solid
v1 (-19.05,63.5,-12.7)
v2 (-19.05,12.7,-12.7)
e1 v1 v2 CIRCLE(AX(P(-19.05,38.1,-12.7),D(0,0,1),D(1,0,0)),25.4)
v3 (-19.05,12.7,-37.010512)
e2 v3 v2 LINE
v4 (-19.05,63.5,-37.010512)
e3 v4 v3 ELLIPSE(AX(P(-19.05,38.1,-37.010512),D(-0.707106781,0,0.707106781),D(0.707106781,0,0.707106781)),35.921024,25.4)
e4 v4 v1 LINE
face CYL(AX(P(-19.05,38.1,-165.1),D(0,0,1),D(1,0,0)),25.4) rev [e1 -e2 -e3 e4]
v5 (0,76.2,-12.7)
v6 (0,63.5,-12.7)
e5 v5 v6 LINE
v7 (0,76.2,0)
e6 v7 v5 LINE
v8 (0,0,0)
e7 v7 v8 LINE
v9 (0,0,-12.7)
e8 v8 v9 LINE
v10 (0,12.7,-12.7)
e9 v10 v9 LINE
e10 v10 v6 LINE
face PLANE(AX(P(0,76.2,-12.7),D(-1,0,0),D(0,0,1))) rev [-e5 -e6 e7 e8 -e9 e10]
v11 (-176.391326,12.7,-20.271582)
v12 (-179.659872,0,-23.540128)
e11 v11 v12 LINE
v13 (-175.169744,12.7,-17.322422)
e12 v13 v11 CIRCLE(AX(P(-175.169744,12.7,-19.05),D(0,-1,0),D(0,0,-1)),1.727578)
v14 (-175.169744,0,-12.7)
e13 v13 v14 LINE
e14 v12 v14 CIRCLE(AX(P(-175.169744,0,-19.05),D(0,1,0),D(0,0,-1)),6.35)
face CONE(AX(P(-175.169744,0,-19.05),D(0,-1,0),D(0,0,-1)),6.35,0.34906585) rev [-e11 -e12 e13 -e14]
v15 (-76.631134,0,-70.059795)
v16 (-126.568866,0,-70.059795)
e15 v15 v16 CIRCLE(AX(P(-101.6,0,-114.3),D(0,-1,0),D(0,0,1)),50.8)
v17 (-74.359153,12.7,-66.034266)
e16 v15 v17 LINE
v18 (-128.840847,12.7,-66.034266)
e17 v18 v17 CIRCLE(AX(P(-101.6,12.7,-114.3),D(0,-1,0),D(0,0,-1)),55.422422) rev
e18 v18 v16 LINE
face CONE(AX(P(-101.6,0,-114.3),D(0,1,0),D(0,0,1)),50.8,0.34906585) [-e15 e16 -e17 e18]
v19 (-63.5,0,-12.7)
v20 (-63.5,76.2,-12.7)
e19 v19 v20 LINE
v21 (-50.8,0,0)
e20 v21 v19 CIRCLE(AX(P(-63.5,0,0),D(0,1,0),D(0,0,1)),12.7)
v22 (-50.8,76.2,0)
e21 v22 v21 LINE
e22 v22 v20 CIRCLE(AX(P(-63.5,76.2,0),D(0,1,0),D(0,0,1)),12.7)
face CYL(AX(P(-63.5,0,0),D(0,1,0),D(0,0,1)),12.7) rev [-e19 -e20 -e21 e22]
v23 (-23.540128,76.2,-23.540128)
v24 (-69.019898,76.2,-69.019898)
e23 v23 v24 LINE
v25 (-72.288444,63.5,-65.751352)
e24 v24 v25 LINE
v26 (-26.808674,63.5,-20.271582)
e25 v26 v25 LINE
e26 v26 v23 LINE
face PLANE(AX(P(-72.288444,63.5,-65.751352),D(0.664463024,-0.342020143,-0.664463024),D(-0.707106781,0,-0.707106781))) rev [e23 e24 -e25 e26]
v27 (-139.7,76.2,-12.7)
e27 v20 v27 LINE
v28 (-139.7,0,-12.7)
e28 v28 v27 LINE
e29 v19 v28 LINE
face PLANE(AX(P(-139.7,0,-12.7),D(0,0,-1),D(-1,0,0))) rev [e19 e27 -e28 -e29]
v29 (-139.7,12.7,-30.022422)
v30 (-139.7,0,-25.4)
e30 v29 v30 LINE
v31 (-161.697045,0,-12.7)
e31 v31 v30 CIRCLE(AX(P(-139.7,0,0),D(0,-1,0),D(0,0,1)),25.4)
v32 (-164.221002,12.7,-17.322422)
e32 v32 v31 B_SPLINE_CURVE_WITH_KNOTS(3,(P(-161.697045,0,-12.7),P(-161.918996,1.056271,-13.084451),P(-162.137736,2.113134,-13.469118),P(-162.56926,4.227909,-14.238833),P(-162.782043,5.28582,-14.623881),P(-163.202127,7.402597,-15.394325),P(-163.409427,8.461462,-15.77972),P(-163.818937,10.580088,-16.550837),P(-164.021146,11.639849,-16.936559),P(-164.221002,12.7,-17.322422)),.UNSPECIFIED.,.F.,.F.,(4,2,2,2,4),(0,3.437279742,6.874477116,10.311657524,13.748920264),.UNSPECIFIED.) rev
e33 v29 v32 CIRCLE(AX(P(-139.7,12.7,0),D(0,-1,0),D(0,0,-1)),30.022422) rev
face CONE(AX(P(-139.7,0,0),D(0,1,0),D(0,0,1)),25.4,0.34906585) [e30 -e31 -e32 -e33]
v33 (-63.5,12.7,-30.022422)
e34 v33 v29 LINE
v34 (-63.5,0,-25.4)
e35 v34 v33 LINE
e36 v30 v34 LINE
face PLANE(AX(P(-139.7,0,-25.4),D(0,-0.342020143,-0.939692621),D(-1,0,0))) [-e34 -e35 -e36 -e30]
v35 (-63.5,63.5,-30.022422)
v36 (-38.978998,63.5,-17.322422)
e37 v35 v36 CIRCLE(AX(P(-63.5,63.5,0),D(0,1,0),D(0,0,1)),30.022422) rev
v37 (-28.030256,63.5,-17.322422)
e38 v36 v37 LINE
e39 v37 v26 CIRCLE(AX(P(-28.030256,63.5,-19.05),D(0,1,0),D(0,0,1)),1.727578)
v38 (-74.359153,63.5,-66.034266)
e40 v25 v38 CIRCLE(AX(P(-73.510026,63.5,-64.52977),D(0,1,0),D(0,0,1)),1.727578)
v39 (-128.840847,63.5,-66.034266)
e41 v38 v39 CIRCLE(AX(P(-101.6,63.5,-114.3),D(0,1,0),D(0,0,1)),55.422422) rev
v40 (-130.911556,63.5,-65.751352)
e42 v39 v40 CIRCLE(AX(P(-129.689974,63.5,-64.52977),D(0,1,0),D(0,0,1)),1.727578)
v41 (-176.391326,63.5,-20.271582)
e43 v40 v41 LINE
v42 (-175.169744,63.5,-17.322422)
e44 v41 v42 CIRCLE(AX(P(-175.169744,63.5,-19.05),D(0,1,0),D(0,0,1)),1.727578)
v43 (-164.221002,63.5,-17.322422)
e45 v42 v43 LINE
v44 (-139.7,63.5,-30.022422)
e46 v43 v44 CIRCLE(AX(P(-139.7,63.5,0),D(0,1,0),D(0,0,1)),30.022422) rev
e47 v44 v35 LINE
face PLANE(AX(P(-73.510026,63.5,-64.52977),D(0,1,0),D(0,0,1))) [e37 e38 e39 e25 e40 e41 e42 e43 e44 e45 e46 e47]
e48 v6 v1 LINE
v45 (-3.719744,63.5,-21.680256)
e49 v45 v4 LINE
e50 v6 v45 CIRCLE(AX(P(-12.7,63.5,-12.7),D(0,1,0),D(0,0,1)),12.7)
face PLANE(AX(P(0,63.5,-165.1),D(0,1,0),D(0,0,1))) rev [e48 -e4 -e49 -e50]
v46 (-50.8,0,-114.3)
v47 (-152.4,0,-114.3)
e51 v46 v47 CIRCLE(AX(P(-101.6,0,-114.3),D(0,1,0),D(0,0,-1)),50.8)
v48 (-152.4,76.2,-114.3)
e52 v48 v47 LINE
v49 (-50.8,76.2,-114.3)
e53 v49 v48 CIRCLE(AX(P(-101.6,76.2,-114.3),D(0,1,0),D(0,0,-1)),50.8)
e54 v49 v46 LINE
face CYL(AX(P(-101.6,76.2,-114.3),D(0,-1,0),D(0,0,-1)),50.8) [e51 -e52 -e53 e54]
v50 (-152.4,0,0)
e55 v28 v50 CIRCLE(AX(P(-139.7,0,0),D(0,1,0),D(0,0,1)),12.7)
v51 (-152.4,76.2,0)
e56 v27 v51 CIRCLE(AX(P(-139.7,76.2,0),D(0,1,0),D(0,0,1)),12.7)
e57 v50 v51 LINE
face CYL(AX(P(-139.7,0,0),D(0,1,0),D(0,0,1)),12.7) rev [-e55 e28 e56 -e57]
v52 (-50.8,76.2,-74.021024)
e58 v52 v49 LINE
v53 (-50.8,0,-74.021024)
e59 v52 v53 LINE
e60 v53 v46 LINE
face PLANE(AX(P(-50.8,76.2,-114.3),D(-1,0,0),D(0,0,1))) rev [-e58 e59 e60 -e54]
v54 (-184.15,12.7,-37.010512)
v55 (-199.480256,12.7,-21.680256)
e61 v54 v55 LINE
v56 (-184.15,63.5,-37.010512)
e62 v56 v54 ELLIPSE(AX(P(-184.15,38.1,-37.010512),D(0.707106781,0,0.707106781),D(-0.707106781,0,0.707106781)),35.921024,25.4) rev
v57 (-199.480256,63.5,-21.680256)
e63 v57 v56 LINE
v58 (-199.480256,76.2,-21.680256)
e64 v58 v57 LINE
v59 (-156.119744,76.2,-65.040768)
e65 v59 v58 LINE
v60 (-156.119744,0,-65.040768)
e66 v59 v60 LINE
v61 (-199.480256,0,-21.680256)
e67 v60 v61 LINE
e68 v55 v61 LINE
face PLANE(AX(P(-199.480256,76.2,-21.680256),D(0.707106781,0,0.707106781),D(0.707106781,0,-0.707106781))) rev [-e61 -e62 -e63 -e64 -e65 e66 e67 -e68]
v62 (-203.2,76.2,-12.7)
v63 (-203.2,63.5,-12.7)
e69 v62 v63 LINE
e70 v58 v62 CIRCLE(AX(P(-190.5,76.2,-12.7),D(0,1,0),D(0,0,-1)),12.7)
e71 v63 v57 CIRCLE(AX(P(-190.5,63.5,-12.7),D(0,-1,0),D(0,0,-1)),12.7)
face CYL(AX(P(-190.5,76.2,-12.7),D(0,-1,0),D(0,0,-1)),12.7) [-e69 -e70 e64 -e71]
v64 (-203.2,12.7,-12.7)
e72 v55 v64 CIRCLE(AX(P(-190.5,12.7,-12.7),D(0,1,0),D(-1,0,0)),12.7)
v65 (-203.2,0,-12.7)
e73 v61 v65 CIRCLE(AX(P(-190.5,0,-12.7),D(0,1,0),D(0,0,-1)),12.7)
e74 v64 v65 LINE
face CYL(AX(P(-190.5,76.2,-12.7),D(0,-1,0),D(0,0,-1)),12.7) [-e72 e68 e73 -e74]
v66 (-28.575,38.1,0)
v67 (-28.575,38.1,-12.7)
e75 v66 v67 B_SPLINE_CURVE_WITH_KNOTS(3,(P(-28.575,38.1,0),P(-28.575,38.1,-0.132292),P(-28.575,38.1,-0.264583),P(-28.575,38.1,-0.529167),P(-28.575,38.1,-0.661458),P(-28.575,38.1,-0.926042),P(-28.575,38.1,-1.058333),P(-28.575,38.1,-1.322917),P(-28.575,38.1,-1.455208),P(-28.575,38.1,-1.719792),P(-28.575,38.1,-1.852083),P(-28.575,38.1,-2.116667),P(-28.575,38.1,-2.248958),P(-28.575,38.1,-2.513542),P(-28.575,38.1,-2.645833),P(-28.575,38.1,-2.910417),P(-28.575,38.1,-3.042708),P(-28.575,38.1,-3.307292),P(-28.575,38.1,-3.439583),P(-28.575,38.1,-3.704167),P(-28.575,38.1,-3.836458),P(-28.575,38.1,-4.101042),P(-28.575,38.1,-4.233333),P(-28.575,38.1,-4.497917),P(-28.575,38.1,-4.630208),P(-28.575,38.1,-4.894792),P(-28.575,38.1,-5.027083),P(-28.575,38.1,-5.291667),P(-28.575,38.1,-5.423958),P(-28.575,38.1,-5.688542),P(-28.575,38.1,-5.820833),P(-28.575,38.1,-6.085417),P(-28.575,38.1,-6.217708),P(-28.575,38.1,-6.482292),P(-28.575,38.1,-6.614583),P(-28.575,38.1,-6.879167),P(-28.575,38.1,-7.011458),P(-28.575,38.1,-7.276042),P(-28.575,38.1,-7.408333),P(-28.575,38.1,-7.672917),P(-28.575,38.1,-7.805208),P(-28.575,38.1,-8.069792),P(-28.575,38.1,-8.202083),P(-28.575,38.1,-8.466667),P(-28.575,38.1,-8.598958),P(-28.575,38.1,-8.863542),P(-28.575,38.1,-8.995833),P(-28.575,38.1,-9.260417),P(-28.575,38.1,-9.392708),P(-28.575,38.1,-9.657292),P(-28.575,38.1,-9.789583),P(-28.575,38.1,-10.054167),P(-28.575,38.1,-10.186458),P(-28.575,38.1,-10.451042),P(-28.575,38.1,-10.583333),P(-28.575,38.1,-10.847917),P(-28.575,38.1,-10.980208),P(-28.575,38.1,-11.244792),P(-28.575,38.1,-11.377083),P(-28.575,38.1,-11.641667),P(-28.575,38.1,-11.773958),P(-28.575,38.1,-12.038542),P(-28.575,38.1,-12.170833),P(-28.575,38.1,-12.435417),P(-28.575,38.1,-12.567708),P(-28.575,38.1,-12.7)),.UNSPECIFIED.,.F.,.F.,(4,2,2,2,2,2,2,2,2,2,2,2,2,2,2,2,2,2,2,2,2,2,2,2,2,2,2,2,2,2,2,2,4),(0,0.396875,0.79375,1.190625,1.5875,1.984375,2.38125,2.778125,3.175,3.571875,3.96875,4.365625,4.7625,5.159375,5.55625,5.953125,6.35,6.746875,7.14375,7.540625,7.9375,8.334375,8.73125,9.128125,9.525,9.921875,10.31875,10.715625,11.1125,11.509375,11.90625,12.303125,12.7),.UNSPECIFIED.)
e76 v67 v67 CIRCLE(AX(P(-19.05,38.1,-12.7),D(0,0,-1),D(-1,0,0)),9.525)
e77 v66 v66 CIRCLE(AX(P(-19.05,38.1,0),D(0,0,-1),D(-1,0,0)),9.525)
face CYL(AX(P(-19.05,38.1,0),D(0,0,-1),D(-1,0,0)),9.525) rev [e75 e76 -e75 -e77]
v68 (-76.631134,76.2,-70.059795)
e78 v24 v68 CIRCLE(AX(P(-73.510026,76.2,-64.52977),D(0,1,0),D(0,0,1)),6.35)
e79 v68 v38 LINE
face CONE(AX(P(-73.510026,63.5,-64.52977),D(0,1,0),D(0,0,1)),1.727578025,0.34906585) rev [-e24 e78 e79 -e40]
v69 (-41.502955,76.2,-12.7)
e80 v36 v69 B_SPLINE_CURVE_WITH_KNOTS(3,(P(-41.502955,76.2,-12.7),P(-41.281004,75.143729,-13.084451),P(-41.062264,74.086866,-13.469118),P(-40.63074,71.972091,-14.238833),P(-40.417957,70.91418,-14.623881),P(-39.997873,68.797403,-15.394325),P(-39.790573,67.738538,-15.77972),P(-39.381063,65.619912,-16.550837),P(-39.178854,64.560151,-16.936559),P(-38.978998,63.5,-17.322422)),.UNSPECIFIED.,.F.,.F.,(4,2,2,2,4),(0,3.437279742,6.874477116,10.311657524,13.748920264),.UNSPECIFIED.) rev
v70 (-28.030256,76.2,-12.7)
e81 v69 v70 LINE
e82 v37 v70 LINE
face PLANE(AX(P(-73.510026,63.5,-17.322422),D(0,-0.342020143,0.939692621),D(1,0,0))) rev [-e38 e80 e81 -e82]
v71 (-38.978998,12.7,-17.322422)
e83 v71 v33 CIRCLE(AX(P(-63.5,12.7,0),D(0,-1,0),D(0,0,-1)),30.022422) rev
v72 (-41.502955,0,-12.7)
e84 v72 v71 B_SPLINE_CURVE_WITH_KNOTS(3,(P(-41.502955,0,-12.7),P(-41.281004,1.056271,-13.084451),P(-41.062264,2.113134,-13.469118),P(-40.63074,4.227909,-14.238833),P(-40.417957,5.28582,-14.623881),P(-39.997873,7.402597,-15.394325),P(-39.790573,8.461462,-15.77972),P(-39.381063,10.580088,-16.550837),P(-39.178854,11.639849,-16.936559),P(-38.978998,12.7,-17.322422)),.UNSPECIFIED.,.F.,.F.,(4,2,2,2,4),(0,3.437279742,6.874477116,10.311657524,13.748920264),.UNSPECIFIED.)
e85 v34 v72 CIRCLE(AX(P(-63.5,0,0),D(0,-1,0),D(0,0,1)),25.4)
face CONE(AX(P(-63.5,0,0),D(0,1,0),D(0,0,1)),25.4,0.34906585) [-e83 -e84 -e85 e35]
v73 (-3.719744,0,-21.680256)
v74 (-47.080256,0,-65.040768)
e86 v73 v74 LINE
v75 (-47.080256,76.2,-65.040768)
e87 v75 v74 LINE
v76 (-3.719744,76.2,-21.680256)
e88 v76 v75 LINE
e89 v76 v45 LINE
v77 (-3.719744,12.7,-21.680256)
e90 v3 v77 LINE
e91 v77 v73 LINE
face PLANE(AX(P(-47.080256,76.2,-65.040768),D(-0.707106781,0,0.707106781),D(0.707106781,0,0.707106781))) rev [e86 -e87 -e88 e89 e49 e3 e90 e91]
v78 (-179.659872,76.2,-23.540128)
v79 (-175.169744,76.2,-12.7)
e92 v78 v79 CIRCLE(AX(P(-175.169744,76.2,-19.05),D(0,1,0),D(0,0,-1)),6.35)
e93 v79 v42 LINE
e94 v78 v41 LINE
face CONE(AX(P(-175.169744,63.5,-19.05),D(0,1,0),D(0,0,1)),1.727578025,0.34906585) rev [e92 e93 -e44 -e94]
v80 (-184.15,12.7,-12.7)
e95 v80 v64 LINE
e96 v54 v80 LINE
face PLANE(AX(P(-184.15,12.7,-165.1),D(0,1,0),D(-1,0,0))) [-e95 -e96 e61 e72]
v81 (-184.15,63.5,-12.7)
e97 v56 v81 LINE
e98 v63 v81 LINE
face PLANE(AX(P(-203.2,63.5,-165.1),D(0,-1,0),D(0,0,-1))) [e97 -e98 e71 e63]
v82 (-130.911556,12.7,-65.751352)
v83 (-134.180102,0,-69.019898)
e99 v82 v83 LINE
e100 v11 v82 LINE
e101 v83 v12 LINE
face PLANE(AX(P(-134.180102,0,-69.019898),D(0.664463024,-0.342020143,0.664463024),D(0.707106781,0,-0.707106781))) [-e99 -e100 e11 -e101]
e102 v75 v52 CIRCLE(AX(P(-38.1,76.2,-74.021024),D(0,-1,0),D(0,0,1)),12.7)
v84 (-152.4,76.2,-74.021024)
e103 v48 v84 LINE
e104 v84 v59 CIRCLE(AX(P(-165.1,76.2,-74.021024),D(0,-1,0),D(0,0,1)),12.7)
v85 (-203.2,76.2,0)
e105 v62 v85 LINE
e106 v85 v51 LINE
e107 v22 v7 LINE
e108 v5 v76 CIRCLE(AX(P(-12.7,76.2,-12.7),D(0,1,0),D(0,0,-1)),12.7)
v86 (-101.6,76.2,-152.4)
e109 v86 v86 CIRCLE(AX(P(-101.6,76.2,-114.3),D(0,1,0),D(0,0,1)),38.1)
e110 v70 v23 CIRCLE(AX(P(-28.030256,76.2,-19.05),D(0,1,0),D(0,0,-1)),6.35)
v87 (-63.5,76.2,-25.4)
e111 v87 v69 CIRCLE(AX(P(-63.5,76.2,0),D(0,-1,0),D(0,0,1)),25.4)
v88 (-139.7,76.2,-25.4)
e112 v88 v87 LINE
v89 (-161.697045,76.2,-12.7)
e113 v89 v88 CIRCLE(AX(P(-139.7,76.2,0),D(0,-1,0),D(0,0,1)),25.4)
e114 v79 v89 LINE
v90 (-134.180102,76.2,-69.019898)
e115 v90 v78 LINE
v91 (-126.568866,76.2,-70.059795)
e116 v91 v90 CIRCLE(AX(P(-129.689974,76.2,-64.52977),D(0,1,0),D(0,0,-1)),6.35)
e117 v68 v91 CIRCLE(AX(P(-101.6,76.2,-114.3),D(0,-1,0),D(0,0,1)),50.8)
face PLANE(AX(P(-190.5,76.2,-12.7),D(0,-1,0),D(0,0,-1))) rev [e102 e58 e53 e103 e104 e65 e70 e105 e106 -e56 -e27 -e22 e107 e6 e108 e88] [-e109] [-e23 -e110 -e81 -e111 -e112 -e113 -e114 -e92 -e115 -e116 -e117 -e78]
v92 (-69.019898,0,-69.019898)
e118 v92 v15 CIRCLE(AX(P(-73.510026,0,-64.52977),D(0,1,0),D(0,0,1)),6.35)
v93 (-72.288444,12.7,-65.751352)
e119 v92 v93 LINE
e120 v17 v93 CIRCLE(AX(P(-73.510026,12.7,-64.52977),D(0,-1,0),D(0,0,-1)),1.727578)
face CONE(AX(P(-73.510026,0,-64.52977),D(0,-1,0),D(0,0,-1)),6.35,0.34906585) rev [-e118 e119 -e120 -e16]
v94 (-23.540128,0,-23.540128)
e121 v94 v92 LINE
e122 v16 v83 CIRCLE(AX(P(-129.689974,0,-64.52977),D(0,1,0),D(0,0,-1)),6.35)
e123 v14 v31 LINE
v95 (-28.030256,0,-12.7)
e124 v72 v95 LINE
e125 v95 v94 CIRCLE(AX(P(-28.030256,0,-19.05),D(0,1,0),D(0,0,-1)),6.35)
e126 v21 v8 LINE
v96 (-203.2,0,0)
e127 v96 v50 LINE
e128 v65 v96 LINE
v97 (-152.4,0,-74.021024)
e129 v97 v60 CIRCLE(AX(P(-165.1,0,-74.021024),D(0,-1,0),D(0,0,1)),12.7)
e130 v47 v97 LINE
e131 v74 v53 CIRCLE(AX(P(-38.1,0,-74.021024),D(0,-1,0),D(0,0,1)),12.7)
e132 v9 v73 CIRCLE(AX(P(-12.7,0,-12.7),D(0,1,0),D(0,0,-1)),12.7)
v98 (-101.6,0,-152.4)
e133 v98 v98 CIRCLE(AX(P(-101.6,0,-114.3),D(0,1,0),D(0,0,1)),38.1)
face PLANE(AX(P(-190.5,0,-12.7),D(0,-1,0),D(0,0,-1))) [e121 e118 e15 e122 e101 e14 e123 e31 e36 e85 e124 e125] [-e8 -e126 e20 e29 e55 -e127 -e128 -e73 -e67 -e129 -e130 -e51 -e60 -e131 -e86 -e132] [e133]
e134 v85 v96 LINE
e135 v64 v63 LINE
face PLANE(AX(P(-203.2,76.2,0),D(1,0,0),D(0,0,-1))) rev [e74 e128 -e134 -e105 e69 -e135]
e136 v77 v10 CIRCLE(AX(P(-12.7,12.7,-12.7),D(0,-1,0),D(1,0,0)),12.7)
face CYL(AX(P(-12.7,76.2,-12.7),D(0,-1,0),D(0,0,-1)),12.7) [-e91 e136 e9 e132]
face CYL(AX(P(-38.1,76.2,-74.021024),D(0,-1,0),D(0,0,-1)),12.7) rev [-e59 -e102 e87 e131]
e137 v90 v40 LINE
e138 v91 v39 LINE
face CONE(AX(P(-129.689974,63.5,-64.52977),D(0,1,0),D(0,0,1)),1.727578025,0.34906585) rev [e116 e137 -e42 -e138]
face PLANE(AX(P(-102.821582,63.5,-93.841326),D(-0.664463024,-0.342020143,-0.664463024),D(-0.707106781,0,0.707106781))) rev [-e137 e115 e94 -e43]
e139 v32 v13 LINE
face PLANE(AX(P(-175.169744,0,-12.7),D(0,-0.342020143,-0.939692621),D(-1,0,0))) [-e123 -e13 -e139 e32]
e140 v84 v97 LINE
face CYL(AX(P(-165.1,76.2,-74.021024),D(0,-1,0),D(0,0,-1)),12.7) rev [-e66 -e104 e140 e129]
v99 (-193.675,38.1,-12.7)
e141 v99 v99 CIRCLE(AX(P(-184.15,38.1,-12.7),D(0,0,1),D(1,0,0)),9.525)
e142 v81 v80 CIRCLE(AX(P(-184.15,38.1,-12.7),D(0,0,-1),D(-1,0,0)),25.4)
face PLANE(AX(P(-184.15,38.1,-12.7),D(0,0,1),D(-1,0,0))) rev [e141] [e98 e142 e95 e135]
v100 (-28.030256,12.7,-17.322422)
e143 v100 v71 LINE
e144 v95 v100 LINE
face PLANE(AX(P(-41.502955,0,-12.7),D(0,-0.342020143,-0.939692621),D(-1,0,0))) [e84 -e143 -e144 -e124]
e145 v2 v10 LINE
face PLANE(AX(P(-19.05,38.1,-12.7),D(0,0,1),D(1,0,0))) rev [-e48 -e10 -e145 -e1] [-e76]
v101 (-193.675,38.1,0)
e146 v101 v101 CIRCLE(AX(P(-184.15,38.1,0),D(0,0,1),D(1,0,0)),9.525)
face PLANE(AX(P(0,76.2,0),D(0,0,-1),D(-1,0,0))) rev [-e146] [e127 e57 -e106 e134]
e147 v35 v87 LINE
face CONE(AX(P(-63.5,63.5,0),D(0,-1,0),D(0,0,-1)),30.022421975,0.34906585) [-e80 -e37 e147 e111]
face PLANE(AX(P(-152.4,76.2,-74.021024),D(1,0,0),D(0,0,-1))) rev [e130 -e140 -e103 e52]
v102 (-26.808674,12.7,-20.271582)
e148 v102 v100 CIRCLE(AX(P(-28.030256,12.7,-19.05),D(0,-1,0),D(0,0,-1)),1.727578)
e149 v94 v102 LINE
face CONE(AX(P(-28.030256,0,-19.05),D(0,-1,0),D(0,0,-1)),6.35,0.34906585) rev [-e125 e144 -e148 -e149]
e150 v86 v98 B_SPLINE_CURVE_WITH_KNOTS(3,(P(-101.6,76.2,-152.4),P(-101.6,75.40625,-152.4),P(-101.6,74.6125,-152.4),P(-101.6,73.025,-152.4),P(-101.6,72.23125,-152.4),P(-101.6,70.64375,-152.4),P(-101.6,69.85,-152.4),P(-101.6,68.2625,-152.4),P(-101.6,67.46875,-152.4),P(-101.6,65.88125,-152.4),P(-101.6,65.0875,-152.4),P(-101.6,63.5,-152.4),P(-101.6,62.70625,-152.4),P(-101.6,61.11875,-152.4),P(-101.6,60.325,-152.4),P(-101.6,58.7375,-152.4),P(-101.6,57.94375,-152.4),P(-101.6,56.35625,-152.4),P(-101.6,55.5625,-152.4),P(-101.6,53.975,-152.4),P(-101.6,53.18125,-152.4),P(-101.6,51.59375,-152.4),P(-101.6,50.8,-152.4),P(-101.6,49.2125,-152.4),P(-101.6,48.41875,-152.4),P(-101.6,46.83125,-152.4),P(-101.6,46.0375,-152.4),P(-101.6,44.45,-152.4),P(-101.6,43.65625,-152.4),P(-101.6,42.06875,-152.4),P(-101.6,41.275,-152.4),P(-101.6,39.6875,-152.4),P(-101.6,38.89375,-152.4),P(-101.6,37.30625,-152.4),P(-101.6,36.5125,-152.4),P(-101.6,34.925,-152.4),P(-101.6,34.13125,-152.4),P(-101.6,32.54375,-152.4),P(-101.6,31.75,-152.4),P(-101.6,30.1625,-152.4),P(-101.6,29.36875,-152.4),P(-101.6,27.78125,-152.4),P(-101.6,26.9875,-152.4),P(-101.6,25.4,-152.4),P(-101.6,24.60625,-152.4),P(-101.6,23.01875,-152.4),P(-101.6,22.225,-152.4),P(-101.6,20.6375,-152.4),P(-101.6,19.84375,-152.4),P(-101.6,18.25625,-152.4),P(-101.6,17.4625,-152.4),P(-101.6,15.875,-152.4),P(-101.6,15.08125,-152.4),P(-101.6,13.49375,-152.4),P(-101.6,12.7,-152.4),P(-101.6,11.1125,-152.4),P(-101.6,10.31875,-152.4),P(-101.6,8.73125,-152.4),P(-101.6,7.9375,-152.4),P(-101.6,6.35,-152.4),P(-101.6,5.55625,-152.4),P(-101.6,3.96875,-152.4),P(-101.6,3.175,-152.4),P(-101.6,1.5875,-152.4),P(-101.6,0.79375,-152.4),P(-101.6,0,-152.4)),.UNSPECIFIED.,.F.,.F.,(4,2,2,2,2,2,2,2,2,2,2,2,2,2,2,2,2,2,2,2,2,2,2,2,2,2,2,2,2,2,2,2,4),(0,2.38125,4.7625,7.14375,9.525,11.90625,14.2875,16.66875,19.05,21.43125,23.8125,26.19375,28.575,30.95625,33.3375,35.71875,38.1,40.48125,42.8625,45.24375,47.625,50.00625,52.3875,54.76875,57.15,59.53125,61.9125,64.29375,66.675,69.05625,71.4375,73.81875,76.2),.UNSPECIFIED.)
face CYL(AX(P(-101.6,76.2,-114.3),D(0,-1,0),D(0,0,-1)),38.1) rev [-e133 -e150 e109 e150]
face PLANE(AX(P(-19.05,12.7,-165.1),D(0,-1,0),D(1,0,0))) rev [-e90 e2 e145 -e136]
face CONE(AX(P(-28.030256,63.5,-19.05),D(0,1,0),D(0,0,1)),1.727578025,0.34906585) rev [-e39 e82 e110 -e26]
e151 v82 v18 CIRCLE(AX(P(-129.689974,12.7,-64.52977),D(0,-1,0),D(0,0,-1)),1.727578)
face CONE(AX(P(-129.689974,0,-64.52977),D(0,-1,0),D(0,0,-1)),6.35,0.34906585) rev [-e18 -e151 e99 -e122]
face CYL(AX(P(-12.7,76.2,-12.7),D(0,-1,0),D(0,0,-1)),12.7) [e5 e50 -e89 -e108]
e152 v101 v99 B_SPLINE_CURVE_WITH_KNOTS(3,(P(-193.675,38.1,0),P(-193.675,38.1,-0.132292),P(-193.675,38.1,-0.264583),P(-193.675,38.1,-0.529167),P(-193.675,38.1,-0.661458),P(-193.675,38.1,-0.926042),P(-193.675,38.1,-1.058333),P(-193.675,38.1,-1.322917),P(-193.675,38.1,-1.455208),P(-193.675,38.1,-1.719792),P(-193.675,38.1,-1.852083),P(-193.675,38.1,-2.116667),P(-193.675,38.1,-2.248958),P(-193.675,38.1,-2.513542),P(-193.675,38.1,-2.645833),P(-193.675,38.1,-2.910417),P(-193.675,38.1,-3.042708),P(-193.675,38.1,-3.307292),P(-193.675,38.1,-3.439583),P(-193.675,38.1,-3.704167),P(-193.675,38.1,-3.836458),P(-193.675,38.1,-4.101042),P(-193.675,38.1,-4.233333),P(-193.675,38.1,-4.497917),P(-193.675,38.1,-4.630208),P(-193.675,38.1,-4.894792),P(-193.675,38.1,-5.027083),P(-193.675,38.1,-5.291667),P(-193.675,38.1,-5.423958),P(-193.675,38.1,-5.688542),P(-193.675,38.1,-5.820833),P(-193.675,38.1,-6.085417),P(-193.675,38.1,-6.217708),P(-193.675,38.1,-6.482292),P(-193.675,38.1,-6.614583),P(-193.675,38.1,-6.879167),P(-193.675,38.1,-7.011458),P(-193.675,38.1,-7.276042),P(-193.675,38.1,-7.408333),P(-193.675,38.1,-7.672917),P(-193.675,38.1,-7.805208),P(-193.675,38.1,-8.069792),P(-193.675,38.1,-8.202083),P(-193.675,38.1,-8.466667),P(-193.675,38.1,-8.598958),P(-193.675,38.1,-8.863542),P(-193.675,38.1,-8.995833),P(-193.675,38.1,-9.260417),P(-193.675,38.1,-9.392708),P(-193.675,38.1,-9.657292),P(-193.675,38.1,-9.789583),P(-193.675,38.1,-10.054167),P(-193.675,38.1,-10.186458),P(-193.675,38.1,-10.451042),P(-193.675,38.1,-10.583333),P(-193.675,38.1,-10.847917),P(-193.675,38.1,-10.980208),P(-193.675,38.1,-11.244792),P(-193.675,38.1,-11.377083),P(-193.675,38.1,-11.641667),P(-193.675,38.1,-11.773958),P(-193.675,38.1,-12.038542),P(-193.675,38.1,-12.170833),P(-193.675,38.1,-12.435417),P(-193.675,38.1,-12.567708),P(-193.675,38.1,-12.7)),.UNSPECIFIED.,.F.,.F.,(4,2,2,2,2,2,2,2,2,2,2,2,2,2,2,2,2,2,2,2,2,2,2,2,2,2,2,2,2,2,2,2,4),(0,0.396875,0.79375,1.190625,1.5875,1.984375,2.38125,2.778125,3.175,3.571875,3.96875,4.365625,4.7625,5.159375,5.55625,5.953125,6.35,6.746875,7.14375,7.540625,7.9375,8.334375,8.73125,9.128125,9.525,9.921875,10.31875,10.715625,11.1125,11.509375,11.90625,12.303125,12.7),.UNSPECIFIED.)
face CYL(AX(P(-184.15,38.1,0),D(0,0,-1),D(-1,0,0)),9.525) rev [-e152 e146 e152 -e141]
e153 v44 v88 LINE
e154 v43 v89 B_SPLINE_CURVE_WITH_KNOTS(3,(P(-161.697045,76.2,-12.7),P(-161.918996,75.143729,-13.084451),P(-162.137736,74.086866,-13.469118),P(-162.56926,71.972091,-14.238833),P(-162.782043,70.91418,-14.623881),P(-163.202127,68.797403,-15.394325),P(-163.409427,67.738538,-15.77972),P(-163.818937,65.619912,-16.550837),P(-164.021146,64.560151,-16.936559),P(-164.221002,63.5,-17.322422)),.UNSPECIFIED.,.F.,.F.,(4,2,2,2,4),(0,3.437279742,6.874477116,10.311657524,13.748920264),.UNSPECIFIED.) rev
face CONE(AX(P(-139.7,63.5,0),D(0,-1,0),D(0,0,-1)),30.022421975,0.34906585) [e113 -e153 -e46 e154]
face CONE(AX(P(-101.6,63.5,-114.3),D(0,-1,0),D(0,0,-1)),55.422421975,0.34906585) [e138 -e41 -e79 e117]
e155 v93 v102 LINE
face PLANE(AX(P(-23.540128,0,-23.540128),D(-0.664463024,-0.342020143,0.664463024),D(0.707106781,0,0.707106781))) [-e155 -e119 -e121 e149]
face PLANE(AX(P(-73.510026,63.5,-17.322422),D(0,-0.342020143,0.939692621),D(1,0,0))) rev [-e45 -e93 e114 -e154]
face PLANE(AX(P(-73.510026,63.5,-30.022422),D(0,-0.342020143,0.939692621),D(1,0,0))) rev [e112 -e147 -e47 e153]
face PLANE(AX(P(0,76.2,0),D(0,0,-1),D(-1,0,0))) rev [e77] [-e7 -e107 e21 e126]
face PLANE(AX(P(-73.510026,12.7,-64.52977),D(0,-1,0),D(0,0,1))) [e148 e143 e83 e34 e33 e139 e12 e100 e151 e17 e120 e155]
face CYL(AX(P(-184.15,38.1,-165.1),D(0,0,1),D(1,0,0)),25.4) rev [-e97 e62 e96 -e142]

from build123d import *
from OCP.BRepFilletAPI import BRepFilletAPI_MakeChamfer

# Parameters (mm, degrees)
SKETCH1_R                  = 38.1
BOSS_EXTRUDE1_DEPTH        = 76.2
CUT_EXTRUDE1_DEPTH         = 273.680564031
CUT_EXTRUDE2_START         = -12.7
CUT_EXTRUDE2_DEPTH         = 260.980564031
SKETCH5_R                  = 9.525
CUT_EXTRUDE3_DEPTH         = 266.183785326
CUT_EXTRUDE4_START         = -12.7
CUT_EXTRUDE4_DEPTH         = 12.7
CHAMFER1_SIZE              = 12.7
CHAMFER1_SIZE_2            = 4.622421975
CHAMFER1_OF_MIRROR2_SIZE   = 12.7
CHAMFER1_OF_MIRROR2_SIZE_2 = 4.622421975


with BuildPart() as part:
    # Sketch1 → Boss-Extrude1 (new body)
    with BuildSketch(Plane(origin=(0, 0, 0), x_dir=(1, 0, 0), z_dir=(0, 1, 0))):
        with BuildLine():
            Line((0, 0), (-203.2, 0))
            Line((-203.2, 0), (-203.2, 12.7))
            ThreePointArc((-203.2, 12.7), (-202.233270063, 17.560079591), (-199.480256121, 21.680256121))
            Line((-199.480256121, 21.680256121), (-156.119743879, 65.040768363))
            ThreePointArc((-156.119743879, 65.040768363), (-153.366729937, 69.160944893), (-152.4, 74.021024484))
            Line((-152.4, 74.021024484), (-152.4, 114.3))
            ThreePointArc((-152.4, 114.3), (-101.6, 165.1), (-50.8, 114.3))
            Line((-50.8, 114.3), (-50.8, 74.021024484))
            ThreePointArc((-50.8, 74.021024484), (-49.833270063, 69.160944893), (-47.080256121, 65.040768363))
            Line((-47.080256121, 65.040768363), (-3.719743879, 21.680256121))
            ThreePointArc((-3.719743879, 21.680256121), (-0.966729937, 17.560079591), (0, 12.7))
            Line((0, 12.7), (0, 0))
        make_face()
        with Locations(Location((-101.6, 114.3, 0), (0, 0, 90))):
            Circle(SKETCH1_R, mode=Mode.SUBTRACT)
    extrude(amount=BOSS_EXTRUDE1_DEPTH)

    # Sketch2 → Cut-Extrude1 (cut, through all)
    with BuildSketch(Plane(origin=(0, 76.2, 0), x_dir=(1, 0, 0), z_dir=(0, 1, 0))):
        with BuildLine():
            Line((-139.7, 12.7), (-63.5, 12.7))
            ThreePointArc((-63.5, 12.7), (-50.8, 0), (-63.5, -12.7))
            Line((-63.5, -12.7), (-139.7, -12.7))
            ThreePointArc((-139.7, -12.7), (-152.4, 0), (-139.7, 12.7))
        make_face()
    extrude(amount=-CUT_EXTRUDE1_DEPTH, mode=Mode.SUBTRACT)

    # Sketch4 → Cut-Extrude2 (cut, through all)
    with BuildSketch(Plane.XY.offset(CUT_EXTRUDE2_START)):
        with BuildLine():
            Line((0, 63.5), (-19.05, 63.5))
            ThreePointArc((-19.05, 63.5), (-44.45, 38.1), (-19.05, 12.7))
            Line((-19.05, 12.7), (0, 12.7))
            Line((0, 12.7), (0, 63.5))
        make_face()
    cut_extrude2 = extrude(amount=-CUT_EXTRUDE2_DEPTH, mode=Mode.SUBTRACT)

    # Sketch5 → Cut-Extrude3 (cut, through all)
    with BuildSketch(Plane(origin=(0, 0, -12.7), x_dir=(-1, 0, 0), z_dir=(0, 0, -1))):
        with Locations((19.05, 38.1)):
            Circle(SKETCH5_R)
    cut_extrude3 = extrude(amount=-CUT_EXTRUDE3_DEPTH, mode=Mode.SUBTRACT)

    # Mirror1: Cut-Extrude2, Cut-Extrude3 across plane
    add(cut_extrude2.mirror(Plane(origin=(-101.6, 0, 0), x_dir=(0, 0, 1), z_dir=(1, 0, 0))), mode=Mode.SUBTRACT)
    add(cut_extrude3.mirror(Plane(origin=(-101.6, 0, 0), x_dir=(0, 0, 1), z_dir=(1, 0, 0))), mode=Mode.SUBTRACT)

    # Sketch6 → Cut-Extrude4 (cut)
    with BuildSketch(Plane(origin=(0, 76.2, 0), x_dir=(1, 0, 0), z_dir=(0, 1, 0)).offset(CUT_EXTRUDE4_START)):
        with BuildLine():
            Line((-23.540128061, 23.540128061), (-69.01989759, 69.01989759))
            ThreePointArc((-69.01989759, 69.01989759), (-72.650432416, 70.821319376), (-76.631133912, 70.059795138))
            ThreePointArc((-76.631133912, 70.059795138), (-101.6, 63.5), (-126.568866088, 70.059795138))
            ThreePointArc((-126.568866088, 70.059795138), (-130.549567584, 70.821319376), (-134.18010241, 69.01989759))
            Line((-134.18010241, 69.01989759), (-179.659871939, 23.540128061))
            ThreePointArc((-179.659871939, 23.540128061), (-181.03637891, 16.619960204), (-175.169743879, 12.7))
            Line((-175.169743879, 12.7), (-161.697045256, 12.7))
            ThreePointArc((-161.697045256, 12.7), (-152.4, 21.997045256), (-139.7, 25.4))
            Line((-139.7, 25.4), (-63.5, 25.4))
            ThreePointArc((-63.5, 25.4), (-50.8, 21.997045256), (-41.502954744, 12.7))
            Line((-41.502954744, 12.7), (-28.030256121, 12.7))
            ThreePointArc((-28.030256121, 12.7), (-22.16362109, 16.619960204), (-23.540128061, 23.540128061))
        make_face()
    cut_extrude4 = extrude(amount=CUT_EXTRUDE4_DEPTH, mode=Mode.SUBTRACT)

    # Chamfer1
    chamfer1_edges_1 = [part.edges().sort_by_distance(p)[0] for p in [
        (-46.280012825, 63.5, -46.280012825),
    ]]
    chamfer1_side_1 = [part.faces().sort_by_distance(p)[0] for p in [
        (-46.280012825, 63.59244844, -46.280012825),
    ]]
    chamfer1_edges_2 = [part.edges().sort_by_distance(p)[0] for p in [
        (-22.16362109, 63.5, -16.619960204),
    ]]
    chamfer1_side_2 = [part.faces().sort_by_distance(p)[0] for p in [
        (-22.16362109, 63.59244844, -16.619960204),
    ]]
    chamfer1_edges_3 = [part.edges().sort_by_distance(p)[0] for p in [
        (-34.766605432, 63.5, -12.7),
    ]]
    chamfer1_side_3 = [part.faces().sort_by_distance(p)[0] for p in [
        (-34.766605432, 63.59244844, -12.7),
    ]]
    chamfer1_edges_4 = [part.edges().sort_by_distance(p)[0] for p in [
        (-50.8, 63.5, -21.997045256),
    ]]
    chamfer1_side_4 = [part.faces().sort_by_distance(p)[0] for p in [
        (-50.8, 63.59244844, -21.997045256),
    ]]
    chamfer1_edges_5 = [part.edges().sort_by_distance(p)[0] for p in [
        (-101.6, 63.5, -25.4),
    ]]
    chamfer1_side_5 = [part.faces().sort_by_distance(p)[0] for p in [
        (-101.6, 63.59244844, -25.4),
    ]]
    chamfer1_edges_6 = [part.edges().sort_by_distance(p)[0] for p in [
        (-152.4, 63.5, -21.997045256),
    ]]
    chamfer1_side_6 = [part.faces().sort_by_distance(p)[0] for p in [
        (-152.4, 63.59244844, -21.997045256),
    ]]
    chamfer1_edges_7 = [part.edges().sort_by_distance(p)[0] for p in [
        (-168.433394568, 63.5, -12.7),
    ]]
    chamfer1_side_7 = [part.faces().sort_by_distance(p)[0] for p in [
        (-168.433394568, 63.59244844, -12.7),
    ]]
    chamfer1_edges_8 = [part.edges().sort_by_distance(p)[0] for p in [
        (-181.03637891, 63.5, -16.619960204),
    ]]
    chamfer1_side_8 = [part.faces().sort_by_distance(p)[0] for p in [
        (-181.03637891, 63.59244844, -16.619960204),
    ]]
    chamfer1_edges_9 = [part.edges().sort_by_distance(p)[0] for p in [
        (-156.919987175, 63.5, -46.280012825),
    ]]
    chamfer1_side_9 = [part.faces().sort_by_distance(p)[0] for p in [
        (-156.919987175, 63.59244844, -46.280012825),
    ]]
    chamfer1_edges_10 = [part.edges().sort_by_distance(p)[0] for p in [
        (-130.549567584, 63.5, -70.821319376),
    ]]
    chamfer1_side_10 = [part.faces().sort_by_distance(p)[0] for p in [
        (-130.549567584, 63.59244844, -70.821319376),
    ]]
    chamfer1_edges_11 = [part.edges().sort_by_distance(p)[0] for p in [
        (-101.6, 63.5, -63.5),
    ]]
    chamfer1_side_11 = [part.faces().sort_by_distance(p)[0] for p in [
        (-101.6, 63.59244844, -63.5),
    ]]
    chamfer1_edges_12 = [part.edges().sort_by_distance(p)[0] for p in [
        (-72.650432416, 63.5, -70.821319376),
    ]]
    chamfer1_side_12 = [part.faces().sort_by_distance(p)[0] for p in [
        (-72.650432416, 63.59244844, -70.821319376),
    ]]
    chamfer1 = BRepFilletAPI_MakeChamfer(part.part.solid().wrapped)
    for e in chamfer1_edges_1:
        chamfer1.Add(CHAMFER1_SIZE - 0.0001, CHAMFER1_SIZE_2 - 0.0001, e.wrapped, chamfer1_side_1[0].wrapped)
    for e in chamfer1_edges_2:
        chamfer1.Add(CHAMFER1_SIZE - 0.0001, CHAMFER1_SIZE_2 - 0.0001, e.wrapped, chamfer1_side_2[0].wrapped)
    for e in chamfer1_edges_3:
        chamfer1.Add(CHAMFER1_SIZE - 0.0001, CHAMFER1_SIZE_2 - 0.0001, e.wrapped, chamfer1_side_3[0].wrapped)
    for e in chamfer1_edges_4:
        chamfer1.Add(CHAMFER1_SIZE - 0.0001, CHAMFER1_SIZE_2 - 0.0001, e.wrapped, chamfer1_side_4[0].wrapped)
    for e in chamfer1_edges_5:
        chamfer1.Add(CHAMFER1_SIZE - 0.0001, CHAMFER1_SIZE_2 - 0.0001, e.wrapped, chamfer1_side_5[0].wrapped)
    for e in chamfer1_edges_6:
        chamfer1.Add(CHAMFER1_SIZE - 0.0001, CHAMFER1_SIZE_2 - 0.0001, e.wrapped, chamfer1_side_6[0].wrapped)
    for e in chamfer1_edges_7:
        chamfer1.Add(CHAMFER1_SIZE - 0.0001, CHAMFER1_SIZE_2 - 0.0001, e.wrapped, chamfer1_side_7[0].wrapped)
    for e in chamfer1_edges_8:
        chamfer1.Add(CHAMFER1_SIZE - 0.0001, CHAMFER1_SIZE_2 - 0.0001, e.wrapped, chamfer1_side_8[0].wrapped)
    for e in chamfer1_edges_9:
        chamfer1.Add(CHAMFER1_SIZE - 0.0001, CHAMFER1_SIZE_2 - 0.0001, e.wrapped, chamfer1_side_9[0].wrapped)
    for e in chamfer1_edges_10:
        chamfer1.Add(CHAMFER1_SIZE - 0.0001, CHAMFER1_SIZE_2 - 0.0001, e.wrapped, chamfer1_side_10[0].wrapped)
    for e in chamfer1_edges_11:
        chamfer1.Add(CHAMFER1_SIZE - 0.0001, CHAMFER1_SIZE_2 - 0.0001, e.wrapped, chamfer1_side_11[0].wrapped)
    for e in chamfer1_edges_12:
        chamfer1.Add(CHAMFER1_SIZE - 0.0001, CHAMFER1_SIZE_2 - 0.0001, e.wrapped, chamfer1_side_12[0].wrapped)
    add(Compound.cast(chamfer1.Shape()), mode=Mode.REPLACE)  # a hair under: the kernel refuses the full size

    # Mirror2: Cut-Extrude4 across plane
    add(cut_extrude4.mirror(Plane.ZX.offset(38.1)), mode=Mode.SUBTRACT)

    # Chamfer1 of Mirror2
    chamfer1_of_mirror2_edges_1 = [part.edges().sort_by_distance(p)[0] for p in [
        (-46.280012825, 12.7, -46.280012825),
    ]]
    chamfer1_of_mirror2_side_1 = [part.faces().sort_by_distance(p)[0] for p in [
        (-46.280012825, 12.60755156, -46.280012825),
    ]]
    chamfer1_of_mirror2_edges_2 = [part.edges().sort_by_distance(p)[0] for p in [
        (-22.16362109, 12.7, -16.619960204),
    ]]
    chamfer1_of_mirror2_side_2 = [part.faces().sort_by_distance(p)[0] for p in [
        (-22.16362109, 12.60755156, -16.619960204),
    ]]
    chamfer1_of_mirror2_edges_3 = [part.edges().sort_by_distance(p)[0] for p in [
        (-34.766605432, 12.7, -12.7),
    ]]
    chamfer1_of_mirror2_side_3 = [part.faces().sort_by_distance(p)[0] for p in [
        (-34.766605432, 12.60755156, -12.7),
    ]]
    chamfer1_of_mirror2_edges_4 = [part.edges().sort_by_distance(p)[0] for p in [
        (-50.8, 12.7, -21.997045256),
    ]]
    chamfer1_of_mirror2_side_4 = [part.faces().sort_by_distance(p)[0] for p in [
        (-50.8, 12.60755156, -21.997045256),
    ]]
    chamfer1_of_mirror2_edges_5 = [part.edges().sort_by_distance(p)[0] for p in [
        (-101.6, 12.7, -25.4),
    ]]
    chamfer1_of_mirror2_side_5 = [part.faces().sort_by_distance(p)[0] for p in [
        (-101.6, 12.60755156, -25.4),
    ]]
    chamfer1_of_mirror2_edges_6 = [part.edges().sort_by_distance(p)[0] for p in [
        (-152.4, 12.7, -21.997045256),
    ]]
    chamfer1_of_mirror2_side_6 = [part.faces().sort_by_distance(p)[0] for p in [
        (-152.4, 12.60755156, -21.997045256),
    ]]
    chamfer1_of_mirror2_edges_7 = [part.edges().sort_by_distance(p)[0] for p in [
        (-168.433394568, 12.7, -12.7),
    ]]
    chamfer1_of_mirror2_side_7 = [part.faces().sort_by_distance(p)[0] for p in [
        (-168.433394568, 12.60755156, -12.7),
    ]]
    chamfer1_of_mirror2_edges_8 = [part.edges().sort_by_distance(p)[0] for p in [
        (-181.03637891, 12.7, -16.619960204),
    ]]
    chamfer1_of_mirror2_side_8 = [part.faces().sort_by_distance(p)[0] for p in [
        (-181.03637891, 12.60755156, -16.619960204),
    ]]
    chamfer1_of_mirror2_edges_9 = [part.edges().sort_by_distance(p)[0] for p in [
        (-156.919987175, 12.7, -46.280012825),
    ]]
    chamfer1_of_mirror2_side_9 = [part.faces().sort_by_distance(p)[0] for p in [
        (-156.919987175, 12.60755156, -46.280012825),
    ]]
    chamfer1_of_mirror2_edges_10 = [part.edges().sort_by_distance(p)[0] for p in [
        (-130.549567584, 12.7, -70.821319376),
    ]]
    chamfer1_of_mirror2_side_10 = [part.faces().sort_by_distance(p)[0] for p in [
        (-130.549567584, 12.60755156, -70.821319376),
    ]]
    chamfer1_of_mirror2_edges_11 = [part.edges().sort_by_distance(p)[0] for p in [
        (-101.6, 12.7, -63.5),
    ]]
    chamfer1_of_mirror2_side_11 = [part.faces().sort_by_distance(p)[0] for p in [
        (-101.6, 12.60755156, -63.5),
    ]]
    chamfer1_of_mirror2_edges_12 = [part.edges().sort_by_distance(p)[0] for p in [
        (-72.650432416, 12.7, -70.821319376),
    ]]
    chamfer1_of_mirror2_side_12 = [part.faces().sort_by_distance(p)[0] for p in [
        (-72.650432416, 12.60755156, -70.821319376),
    ]]
    chamfer1_of_mirror2 = BRepFilletAPI_MakeChamfer(part.part.solid().wrapped)
    for e in chamfer1_of_mirror2_edges_1:
        chamfer1_of_mirror2.Add(CHAMFER1_OF_MIRROR2_SIZE - 0.0001, CHAMFER1_OF_MIRROR2_SIZE_2 - 0.0001, e.wrapped, chamfer1_of_mirror2_side_1[0].wrapped)
    for e in chamfer1_of_mirror2_edges_2:
        chamfer1_of_mirror2.Add(CHAMFER1_OF_MIRROR2_SIZE - 0.0001, CHAMFER1_OF_MIRROR2_SIZE_2 - 0.0001, e.wrapped, chamfer1_of_mirror2_side_2[0].wrapped)
    for e in chamfer1_of_mirror2_edges_3:
        chamfer1_of_mirror2.Add(CHAMFER1_OF_MIRROR2_SIZE - 0.0001, CHAMFER1_OF_MIRROR2_SIZE_2 - 0.0001, e.wrapped, chamfer1_of_mirror2_side_3[0].wrapped)
    for e in chamfer1_of_mirror2_edges_4:
        chamfer1_of_mirror2.Add(CHAMFER1_OF_MIRROR2_SIZE - 0.0001, CHAMFER1_OF_MIRROR2_SIZE_2 - 0.0001, e.wrapped, chamfer1_of_mirror2_side_4[0].wrapped)
    for e in chamfer1_of_mirror2_edges_5:
        chamfer1_of_mirror2.Add(CHAMFER1_OF_MIRROR2_SIZE - 0.0001, CHAMFER1_OF_MIRROR2_SIZE_2 - 0.0001, e.wrapped, chamfer1_of_mirror2_side_5[0].wrapped)
    for e in chamfer1_of_mirror2_edges_6:
        chamfer1_of_mirror2.Add(CHAMFER1_OF_MIRROR2_SIZE - 0.0001, CHAMFER1_OF_MIRROR2_SIZE_2 - 0.0001, e.wrapped, chamfer1_of_mirror2_side_6[0].wrapped)
    for e in chamfer1_of_mirror2_edges_7:
        chamfer1_of_mirror2.Add(CHAMFER1_OF_MIRROR2_SIZE - 0.0001, CHAMFER1_OF_MIRROR2_SIZE_2 - 0.0001, e.wrapped, chamfer1_of_mirror2_side_7[0].wrapped)
    for e in chamfer1_of_mirror2_edges_8:
        chamfer1_of_mirror2.Add(CHAMFER1_OF_MIRROR2_SIZE - 0.0001, CHAMFER1_OF_MIRROR2_SIZE_2 - 0.0001, e.wrapped, chamfer1_of_mirror2_side_8[0].wrapped)
    for e in chamfer1_of_mirror2_edges_9:
        chamfer1_of_mirror2.Add(CHAMFER1_OF_MIRROR2_SIZE - 0.0001, CHAMFER1_OF_MIRROR2_SIZE_2 - 0.0001, e.wrapped, chamfer1_of_mirror2_side_9[0].wrapped)
    for e in chamfer1_of_mirror2_edges_10:
        chamfer1_of_mirror2.Add(CHAMFER1_OF_MIRROR2_SIZE - 0.0001, CHAMFER1_OF_MIRROR2_SIZE_2 - 0.0001, e.wrapped, chamfer1_of_mirror2_side_10[0].wrapped)
    for e in chamfer1_of_mirror2_edges_11:
        chamfer1_of_mirror2.Add(CHAMFER1_OF_MIRROR2_SIZE - 0.0001, CHAMFER1_OF_MIRROR2_SIZE_2 - 0.0001, e.wrapped, chamfer1_of_mirror2_side_11[0].wrapped)
    for e in chamfer1_of_mirror2_edges_12:
        chamfer1_of_mirror2.Add(CHAMFER1_OF_MIRROR2_SIZE - 0.0001, CHAMFER1_OF_MIRROR2_SIZE_2 - 0.0001, e.wrapped, chamfer1_of_mirror2_side_12[0].wrapped)
    add(Compound.cast(chamfer1_of_mirror2.Shape()), mode=Mode.REPLACE)  # a hair under: the kernel refuses the full size


solid = part.part
